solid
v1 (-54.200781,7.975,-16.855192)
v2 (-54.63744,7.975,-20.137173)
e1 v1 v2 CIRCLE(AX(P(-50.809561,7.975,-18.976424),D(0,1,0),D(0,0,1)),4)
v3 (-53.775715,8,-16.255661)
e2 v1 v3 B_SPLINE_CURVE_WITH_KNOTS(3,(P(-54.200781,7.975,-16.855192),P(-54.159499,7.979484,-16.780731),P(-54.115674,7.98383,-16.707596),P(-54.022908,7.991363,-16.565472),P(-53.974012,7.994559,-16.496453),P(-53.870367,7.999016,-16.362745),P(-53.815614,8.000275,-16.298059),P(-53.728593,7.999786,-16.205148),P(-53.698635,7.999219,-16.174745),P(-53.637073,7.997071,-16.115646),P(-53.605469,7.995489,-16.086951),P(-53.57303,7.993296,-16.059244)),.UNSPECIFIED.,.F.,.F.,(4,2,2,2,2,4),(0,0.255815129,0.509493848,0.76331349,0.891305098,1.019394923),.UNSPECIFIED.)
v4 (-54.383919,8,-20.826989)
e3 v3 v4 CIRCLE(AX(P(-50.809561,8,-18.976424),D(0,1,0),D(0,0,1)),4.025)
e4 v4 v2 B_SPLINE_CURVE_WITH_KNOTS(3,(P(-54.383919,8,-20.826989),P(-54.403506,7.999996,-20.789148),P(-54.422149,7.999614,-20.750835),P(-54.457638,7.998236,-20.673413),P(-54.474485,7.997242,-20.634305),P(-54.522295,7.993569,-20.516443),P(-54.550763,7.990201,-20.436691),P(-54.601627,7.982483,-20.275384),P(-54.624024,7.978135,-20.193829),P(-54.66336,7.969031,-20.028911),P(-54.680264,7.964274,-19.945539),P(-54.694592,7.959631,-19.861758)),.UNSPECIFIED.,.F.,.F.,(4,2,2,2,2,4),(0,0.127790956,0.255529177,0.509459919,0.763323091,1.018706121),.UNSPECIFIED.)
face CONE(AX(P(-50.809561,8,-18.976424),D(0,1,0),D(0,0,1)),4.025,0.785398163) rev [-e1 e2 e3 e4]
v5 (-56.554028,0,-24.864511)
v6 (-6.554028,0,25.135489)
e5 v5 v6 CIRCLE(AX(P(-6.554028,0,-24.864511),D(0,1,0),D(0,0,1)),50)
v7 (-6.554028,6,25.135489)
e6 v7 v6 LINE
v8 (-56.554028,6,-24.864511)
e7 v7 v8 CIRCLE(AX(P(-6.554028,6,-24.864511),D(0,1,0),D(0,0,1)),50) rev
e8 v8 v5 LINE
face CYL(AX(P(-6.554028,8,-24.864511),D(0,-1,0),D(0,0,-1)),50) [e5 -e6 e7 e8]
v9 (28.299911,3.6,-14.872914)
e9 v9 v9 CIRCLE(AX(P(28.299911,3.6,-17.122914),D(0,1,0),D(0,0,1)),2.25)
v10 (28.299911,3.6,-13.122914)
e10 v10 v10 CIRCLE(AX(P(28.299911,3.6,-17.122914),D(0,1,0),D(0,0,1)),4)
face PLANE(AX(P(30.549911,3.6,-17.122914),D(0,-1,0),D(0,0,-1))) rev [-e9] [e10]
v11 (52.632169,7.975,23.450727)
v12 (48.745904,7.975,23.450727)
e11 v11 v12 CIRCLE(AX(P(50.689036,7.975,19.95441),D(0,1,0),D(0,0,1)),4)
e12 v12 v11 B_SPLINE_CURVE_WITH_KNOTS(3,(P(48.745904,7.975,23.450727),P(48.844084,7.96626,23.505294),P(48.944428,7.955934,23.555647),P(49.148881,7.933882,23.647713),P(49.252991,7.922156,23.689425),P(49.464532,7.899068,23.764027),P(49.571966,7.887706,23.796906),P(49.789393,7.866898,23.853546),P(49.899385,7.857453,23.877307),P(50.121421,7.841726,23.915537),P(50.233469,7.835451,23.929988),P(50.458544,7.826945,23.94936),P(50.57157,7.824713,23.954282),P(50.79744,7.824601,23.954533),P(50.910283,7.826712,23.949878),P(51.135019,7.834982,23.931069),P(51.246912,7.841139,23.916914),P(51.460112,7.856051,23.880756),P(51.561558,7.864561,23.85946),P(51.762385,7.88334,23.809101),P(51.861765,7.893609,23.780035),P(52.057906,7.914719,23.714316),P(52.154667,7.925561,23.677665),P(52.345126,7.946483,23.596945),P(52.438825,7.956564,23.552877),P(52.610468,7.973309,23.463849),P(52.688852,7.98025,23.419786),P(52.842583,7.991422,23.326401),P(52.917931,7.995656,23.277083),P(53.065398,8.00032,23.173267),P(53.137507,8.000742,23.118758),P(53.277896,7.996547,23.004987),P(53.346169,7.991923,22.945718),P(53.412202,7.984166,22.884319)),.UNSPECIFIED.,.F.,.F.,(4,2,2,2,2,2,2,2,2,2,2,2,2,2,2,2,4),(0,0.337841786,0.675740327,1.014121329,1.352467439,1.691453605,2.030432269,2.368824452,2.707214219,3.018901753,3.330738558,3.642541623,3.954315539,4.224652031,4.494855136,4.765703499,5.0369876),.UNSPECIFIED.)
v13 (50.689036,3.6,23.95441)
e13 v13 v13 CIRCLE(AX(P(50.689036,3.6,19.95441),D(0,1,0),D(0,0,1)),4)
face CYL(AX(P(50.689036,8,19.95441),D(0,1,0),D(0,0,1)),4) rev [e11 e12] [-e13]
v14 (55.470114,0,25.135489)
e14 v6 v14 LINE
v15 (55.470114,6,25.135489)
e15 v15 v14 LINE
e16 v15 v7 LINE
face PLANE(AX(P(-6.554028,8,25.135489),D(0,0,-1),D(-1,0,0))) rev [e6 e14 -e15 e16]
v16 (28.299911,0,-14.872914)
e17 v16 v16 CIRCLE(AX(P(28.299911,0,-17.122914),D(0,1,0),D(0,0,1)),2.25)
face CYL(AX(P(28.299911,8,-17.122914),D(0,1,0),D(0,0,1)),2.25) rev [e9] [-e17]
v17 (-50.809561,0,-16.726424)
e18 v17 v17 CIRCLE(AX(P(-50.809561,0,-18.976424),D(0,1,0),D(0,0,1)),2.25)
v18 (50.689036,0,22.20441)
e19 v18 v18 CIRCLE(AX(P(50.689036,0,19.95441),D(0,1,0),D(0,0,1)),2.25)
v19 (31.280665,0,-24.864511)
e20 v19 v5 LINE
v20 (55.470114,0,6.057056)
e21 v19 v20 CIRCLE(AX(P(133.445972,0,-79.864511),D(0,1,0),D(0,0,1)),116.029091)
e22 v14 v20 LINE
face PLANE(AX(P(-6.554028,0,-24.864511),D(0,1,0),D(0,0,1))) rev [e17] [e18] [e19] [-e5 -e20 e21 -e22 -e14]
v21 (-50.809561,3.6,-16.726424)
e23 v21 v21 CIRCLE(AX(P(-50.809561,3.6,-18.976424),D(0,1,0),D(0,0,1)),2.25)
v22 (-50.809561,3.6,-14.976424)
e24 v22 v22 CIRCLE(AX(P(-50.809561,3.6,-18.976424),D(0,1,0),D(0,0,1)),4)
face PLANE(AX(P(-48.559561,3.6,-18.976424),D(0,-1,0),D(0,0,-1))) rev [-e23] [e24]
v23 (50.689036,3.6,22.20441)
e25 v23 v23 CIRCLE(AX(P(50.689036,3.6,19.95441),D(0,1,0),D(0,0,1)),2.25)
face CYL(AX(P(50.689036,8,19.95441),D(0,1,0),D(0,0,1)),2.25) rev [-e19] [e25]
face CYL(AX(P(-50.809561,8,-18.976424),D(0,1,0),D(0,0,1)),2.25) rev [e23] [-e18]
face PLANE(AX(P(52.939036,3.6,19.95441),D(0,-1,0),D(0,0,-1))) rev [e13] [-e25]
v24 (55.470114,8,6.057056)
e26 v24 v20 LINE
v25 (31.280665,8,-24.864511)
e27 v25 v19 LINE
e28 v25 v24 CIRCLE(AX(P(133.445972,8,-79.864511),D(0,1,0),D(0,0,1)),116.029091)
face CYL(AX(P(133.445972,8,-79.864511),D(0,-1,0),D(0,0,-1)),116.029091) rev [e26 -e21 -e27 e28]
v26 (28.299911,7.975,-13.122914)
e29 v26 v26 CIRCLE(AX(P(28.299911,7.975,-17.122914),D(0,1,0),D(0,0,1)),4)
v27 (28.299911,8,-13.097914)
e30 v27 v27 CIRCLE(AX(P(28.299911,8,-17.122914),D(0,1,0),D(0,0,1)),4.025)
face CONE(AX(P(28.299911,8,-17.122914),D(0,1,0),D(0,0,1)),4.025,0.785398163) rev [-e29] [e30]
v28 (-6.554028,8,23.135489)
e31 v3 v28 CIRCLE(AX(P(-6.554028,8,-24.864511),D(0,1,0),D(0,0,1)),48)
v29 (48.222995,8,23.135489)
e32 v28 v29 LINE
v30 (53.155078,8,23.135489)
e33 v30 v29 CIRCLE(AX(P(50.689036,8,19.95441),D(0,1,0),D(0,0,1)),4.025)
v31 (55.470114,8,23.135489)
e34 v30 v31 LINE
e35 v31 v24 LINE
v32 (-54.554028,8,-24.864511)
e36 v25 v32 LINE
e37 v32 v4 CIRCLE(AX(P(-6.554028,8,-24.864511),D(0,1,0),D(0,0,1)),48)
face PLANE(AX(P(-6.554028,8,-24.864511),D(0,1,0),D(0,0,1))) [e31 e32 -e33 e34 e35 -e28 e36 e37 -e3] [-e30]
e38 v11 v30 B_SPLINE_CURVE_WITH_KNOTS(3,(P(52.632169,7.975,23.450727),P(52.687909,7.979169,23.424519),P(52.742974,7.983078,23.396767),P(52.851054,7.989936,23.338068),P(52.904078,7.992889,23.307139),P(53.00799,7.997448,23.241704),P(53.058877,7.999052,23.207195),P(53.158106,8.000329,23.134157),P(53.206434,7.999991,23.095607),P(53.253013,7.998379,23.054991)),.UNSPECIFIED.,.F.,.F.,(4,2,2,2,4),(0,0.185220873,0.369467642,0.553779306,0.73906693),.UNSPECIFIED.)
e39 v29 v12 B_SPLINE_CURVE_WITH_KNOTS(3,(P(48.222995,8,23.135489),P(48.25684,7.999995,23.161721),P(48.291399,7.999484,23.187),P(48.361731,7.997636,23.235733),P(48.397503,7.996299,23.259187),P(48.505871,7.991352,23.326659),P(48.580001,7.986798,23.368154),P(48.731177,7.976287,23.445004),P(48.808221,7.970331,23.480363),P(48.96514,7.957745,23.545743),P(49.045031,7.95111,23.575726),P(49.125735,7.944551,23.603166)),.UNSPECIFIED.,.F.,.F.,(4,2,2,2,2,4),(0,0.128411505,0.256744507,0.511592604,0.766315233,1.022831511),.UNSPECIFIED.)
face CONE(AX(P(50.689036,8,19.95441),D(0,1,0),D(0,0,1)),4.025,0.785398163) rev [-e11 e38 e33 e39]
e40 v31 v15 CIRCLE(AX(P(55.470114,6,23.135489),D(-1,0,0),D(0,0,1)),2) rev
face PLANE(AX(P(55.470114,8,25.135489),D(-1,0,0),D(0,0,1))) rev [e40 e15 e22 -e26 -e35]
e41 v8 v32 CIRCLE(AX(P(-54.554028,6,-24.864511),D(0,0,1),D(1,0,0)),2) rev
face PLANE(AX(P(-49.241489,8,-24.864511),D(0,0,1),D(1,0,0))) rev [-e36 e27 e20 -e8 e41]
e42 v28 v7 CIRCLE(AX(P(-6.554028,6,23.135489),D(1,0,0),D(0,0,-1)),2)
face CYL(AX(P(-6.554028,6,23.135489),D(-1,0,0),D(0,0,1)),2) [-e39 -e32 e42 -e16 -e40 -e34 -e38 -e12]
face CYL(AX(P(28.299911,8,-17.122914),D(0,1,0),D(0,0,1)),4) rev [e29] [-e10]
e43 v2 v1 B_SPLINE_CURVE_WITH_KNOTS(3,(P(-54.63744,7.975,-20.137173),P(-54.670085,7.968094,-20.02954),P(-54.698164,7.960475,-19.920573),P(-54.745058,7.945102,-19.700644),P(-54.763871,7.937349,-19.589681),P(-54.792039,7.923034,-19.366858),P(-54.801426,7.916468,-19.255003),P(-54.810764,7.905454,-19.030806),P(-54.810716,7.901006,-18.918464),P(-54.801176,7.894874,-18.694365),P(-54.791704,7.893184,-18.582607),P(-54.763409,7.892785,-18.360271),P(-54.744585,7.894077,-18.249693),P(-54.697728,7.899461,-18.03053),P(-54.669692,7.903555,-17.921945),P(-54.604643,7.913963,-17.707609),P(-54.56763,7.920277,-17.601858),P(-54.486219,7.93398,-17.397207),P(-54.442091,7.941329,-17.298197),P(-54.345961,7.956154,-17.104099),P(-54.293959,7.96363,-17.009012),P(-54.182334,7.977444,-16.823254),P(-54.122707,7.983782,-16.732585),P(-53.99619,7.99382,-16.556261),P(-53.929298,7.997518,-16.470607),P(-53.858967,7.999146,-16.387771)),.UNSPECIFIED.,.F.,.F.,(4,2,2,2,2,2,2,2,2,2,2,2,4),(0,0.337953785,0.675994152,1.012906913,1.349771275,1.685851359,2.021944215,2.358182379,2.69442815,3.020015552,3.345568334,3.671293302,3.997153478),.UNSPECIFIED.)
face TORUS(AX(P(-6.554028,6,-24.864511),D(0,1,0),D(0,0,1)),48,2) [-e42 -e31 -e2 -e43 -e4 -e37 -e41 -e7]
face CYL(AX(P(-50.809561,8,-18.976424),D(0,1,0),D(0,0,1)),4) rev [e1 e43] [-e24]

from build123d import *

# Parameters (mm, degrees)
BOSS_EXTRUDE2_DEPTH                          = 8
CBORE_FOR_M4_HEX_SOCKET_HEAD_CAP_SCR_2_COUNT = 2
CBORE_FOR_M4_HEX_SOCKET_HEAD_CAP_SCR_2_PITCH = 43.312825964
CBORE_FOR_M4_HEX_SOCKET_HEAD_CAP_SCR_3_COUNT = 2
CBORE_FOR_M4_HEX_SOCKET_HEAD_CAP_SCR_3_PITCH = 79.131181871
FILLET1_R                                    = 2


with BuildPart() as part:
    # Sketch6 → Boss-Extrude2 (new body)
    with BuildSketch(Plane(origin=(0, 0, 0), x_dir=(1, 0, 0), z_dir=(0, 1, 0))):
        with BuildLine():
            Line((-49.241489328, 24.864510752), (-56.554028145, 24.864510752))
            ThreePointArc((-56.554028145, 24.864510752), (-41.909367204, -10.490828308), (-6.554028145, -25.135489248))
            Line((-6.554028145, -25.135489248), (55.470114159, -25.135489248))
            Line((55.470114159, -25.135489248), (55.470114159, -6.057055904))
            ThreePointArc((55.470114159, -6.057055904), (42.058086193, 8.373222092), (31.280664632, 24.864510752))
            Line((31.280664632, 24.864510752), (15.257491481, 24.864510752))
            Line((15.257491481, 24.864510752), (-49.241489328, 24.864510752))
        make_face()
    extrude(amount=BOSS_EXTRUDE2_DEPTH)

    # Sketch9 → CBORE for M4 Hex Socket Head Cap Screw1 (revolve, cut)
    with BuildSketch(Plane(origin=(28.299910658, 8, -17.122913845), x_dir=(0, 0, 1), z_dir=(1, 0, 0))):
        Polygon((0, 0), (0, 11.451936393), (2.25, 10.1), (2.25, 4.4), (4, 4.4), (4, 0.025), (4.025, 0), align=None)
    cbore_for_m4_hex_socket_head_cap_screw1 = revolve(axis=Axis((28.299910658, 14.35, -17.122913845), (0, -1, 0)), mode=Mode.SUBTRACT)

    # CBORE for M4 Hex Socket Head Cap Scr 2: CBORE for M4 Hex Socket Head Cap Screw1 ×2
    with Locations(*[Vector(0.5169167622472475, 0, 0.8560356656751065) * (i * CBORE_FOR_M4_HEX_SOCKET_HEAD_CAP_SCR_2_PITCH) for i in range(1, CBORE_FOR_M4_HEX_SOCKET_HEAD_CAP_SCR_2_COUNT)]):
        add(cbore_for_m4_hex_socket_head_cap_screw1, mode=Mode.SUBTRACT)

    # CBORE for M4 Hex Socket Head Cap Scr 3: CBORE for M4 Hex Socket Head Cap Screw1 ×2
    with Locations(*[Vector(-0.9997256378089421, 0, -0.023423259967479314) * (i * CBORE_FOR_M4_HEX_SOCKET_HEAD_CAP_SCR_3_PITCH) for i in range(1, CBORE_FOR_M4_HEX_SOCKET_HEAD_CAP_SCR_3_COUNT)]):
        add(cbore_for_m4_hex_socket_head_cap_screw1, mode=Mode.SUBTRACT)

    # Fillet1
    # the kernel refuses this fillet: 2 mm, written as the material it takes off along each edge
    with BuildSketch(Plane(origin=(-6.554028145, 8, -24.864510752), x_dir=(-0.99500015408545, 0, -0.09987338669500904), z_dir=(0.09987338669500904, 0, -0.99500015408545))) as fillet1_piece_1:
        with BuildLine():
            CenterArc((50 - FILLET1_R, -FILLET1_R), FILLET1_R, 0, 90)
            Line((50, -FILLET1_R), (50, 0))
            Line((50, 0), (50 - FILLET1_R, 0))
        make_face()
    revolve(axis=Axis((-6.554028145, 8, -24.864510752), (0, 1, 0)), revolution_arc=95.731879569, mode=Mode.SUBTRACT)
    with BuildSketch(Plane(origin=(-6.554028145, 8, 25.135489248), x_dir=(0, 0, -1), z_dir=(1, 0, 0))) as fillet1_piece_2:
        with BuildLine():
            CenterArc((FILLET1_R, -FILLET1_R), FILLET1_R, 90, 90)
            Line((0, -FILLET1_R), (0, 0))
            Line((0, 0), (FILLET1_R, 0))
        make_face()
    extrude(amount=67.024142304, mode=Mode.SUBTRACT)


solid = part.part
